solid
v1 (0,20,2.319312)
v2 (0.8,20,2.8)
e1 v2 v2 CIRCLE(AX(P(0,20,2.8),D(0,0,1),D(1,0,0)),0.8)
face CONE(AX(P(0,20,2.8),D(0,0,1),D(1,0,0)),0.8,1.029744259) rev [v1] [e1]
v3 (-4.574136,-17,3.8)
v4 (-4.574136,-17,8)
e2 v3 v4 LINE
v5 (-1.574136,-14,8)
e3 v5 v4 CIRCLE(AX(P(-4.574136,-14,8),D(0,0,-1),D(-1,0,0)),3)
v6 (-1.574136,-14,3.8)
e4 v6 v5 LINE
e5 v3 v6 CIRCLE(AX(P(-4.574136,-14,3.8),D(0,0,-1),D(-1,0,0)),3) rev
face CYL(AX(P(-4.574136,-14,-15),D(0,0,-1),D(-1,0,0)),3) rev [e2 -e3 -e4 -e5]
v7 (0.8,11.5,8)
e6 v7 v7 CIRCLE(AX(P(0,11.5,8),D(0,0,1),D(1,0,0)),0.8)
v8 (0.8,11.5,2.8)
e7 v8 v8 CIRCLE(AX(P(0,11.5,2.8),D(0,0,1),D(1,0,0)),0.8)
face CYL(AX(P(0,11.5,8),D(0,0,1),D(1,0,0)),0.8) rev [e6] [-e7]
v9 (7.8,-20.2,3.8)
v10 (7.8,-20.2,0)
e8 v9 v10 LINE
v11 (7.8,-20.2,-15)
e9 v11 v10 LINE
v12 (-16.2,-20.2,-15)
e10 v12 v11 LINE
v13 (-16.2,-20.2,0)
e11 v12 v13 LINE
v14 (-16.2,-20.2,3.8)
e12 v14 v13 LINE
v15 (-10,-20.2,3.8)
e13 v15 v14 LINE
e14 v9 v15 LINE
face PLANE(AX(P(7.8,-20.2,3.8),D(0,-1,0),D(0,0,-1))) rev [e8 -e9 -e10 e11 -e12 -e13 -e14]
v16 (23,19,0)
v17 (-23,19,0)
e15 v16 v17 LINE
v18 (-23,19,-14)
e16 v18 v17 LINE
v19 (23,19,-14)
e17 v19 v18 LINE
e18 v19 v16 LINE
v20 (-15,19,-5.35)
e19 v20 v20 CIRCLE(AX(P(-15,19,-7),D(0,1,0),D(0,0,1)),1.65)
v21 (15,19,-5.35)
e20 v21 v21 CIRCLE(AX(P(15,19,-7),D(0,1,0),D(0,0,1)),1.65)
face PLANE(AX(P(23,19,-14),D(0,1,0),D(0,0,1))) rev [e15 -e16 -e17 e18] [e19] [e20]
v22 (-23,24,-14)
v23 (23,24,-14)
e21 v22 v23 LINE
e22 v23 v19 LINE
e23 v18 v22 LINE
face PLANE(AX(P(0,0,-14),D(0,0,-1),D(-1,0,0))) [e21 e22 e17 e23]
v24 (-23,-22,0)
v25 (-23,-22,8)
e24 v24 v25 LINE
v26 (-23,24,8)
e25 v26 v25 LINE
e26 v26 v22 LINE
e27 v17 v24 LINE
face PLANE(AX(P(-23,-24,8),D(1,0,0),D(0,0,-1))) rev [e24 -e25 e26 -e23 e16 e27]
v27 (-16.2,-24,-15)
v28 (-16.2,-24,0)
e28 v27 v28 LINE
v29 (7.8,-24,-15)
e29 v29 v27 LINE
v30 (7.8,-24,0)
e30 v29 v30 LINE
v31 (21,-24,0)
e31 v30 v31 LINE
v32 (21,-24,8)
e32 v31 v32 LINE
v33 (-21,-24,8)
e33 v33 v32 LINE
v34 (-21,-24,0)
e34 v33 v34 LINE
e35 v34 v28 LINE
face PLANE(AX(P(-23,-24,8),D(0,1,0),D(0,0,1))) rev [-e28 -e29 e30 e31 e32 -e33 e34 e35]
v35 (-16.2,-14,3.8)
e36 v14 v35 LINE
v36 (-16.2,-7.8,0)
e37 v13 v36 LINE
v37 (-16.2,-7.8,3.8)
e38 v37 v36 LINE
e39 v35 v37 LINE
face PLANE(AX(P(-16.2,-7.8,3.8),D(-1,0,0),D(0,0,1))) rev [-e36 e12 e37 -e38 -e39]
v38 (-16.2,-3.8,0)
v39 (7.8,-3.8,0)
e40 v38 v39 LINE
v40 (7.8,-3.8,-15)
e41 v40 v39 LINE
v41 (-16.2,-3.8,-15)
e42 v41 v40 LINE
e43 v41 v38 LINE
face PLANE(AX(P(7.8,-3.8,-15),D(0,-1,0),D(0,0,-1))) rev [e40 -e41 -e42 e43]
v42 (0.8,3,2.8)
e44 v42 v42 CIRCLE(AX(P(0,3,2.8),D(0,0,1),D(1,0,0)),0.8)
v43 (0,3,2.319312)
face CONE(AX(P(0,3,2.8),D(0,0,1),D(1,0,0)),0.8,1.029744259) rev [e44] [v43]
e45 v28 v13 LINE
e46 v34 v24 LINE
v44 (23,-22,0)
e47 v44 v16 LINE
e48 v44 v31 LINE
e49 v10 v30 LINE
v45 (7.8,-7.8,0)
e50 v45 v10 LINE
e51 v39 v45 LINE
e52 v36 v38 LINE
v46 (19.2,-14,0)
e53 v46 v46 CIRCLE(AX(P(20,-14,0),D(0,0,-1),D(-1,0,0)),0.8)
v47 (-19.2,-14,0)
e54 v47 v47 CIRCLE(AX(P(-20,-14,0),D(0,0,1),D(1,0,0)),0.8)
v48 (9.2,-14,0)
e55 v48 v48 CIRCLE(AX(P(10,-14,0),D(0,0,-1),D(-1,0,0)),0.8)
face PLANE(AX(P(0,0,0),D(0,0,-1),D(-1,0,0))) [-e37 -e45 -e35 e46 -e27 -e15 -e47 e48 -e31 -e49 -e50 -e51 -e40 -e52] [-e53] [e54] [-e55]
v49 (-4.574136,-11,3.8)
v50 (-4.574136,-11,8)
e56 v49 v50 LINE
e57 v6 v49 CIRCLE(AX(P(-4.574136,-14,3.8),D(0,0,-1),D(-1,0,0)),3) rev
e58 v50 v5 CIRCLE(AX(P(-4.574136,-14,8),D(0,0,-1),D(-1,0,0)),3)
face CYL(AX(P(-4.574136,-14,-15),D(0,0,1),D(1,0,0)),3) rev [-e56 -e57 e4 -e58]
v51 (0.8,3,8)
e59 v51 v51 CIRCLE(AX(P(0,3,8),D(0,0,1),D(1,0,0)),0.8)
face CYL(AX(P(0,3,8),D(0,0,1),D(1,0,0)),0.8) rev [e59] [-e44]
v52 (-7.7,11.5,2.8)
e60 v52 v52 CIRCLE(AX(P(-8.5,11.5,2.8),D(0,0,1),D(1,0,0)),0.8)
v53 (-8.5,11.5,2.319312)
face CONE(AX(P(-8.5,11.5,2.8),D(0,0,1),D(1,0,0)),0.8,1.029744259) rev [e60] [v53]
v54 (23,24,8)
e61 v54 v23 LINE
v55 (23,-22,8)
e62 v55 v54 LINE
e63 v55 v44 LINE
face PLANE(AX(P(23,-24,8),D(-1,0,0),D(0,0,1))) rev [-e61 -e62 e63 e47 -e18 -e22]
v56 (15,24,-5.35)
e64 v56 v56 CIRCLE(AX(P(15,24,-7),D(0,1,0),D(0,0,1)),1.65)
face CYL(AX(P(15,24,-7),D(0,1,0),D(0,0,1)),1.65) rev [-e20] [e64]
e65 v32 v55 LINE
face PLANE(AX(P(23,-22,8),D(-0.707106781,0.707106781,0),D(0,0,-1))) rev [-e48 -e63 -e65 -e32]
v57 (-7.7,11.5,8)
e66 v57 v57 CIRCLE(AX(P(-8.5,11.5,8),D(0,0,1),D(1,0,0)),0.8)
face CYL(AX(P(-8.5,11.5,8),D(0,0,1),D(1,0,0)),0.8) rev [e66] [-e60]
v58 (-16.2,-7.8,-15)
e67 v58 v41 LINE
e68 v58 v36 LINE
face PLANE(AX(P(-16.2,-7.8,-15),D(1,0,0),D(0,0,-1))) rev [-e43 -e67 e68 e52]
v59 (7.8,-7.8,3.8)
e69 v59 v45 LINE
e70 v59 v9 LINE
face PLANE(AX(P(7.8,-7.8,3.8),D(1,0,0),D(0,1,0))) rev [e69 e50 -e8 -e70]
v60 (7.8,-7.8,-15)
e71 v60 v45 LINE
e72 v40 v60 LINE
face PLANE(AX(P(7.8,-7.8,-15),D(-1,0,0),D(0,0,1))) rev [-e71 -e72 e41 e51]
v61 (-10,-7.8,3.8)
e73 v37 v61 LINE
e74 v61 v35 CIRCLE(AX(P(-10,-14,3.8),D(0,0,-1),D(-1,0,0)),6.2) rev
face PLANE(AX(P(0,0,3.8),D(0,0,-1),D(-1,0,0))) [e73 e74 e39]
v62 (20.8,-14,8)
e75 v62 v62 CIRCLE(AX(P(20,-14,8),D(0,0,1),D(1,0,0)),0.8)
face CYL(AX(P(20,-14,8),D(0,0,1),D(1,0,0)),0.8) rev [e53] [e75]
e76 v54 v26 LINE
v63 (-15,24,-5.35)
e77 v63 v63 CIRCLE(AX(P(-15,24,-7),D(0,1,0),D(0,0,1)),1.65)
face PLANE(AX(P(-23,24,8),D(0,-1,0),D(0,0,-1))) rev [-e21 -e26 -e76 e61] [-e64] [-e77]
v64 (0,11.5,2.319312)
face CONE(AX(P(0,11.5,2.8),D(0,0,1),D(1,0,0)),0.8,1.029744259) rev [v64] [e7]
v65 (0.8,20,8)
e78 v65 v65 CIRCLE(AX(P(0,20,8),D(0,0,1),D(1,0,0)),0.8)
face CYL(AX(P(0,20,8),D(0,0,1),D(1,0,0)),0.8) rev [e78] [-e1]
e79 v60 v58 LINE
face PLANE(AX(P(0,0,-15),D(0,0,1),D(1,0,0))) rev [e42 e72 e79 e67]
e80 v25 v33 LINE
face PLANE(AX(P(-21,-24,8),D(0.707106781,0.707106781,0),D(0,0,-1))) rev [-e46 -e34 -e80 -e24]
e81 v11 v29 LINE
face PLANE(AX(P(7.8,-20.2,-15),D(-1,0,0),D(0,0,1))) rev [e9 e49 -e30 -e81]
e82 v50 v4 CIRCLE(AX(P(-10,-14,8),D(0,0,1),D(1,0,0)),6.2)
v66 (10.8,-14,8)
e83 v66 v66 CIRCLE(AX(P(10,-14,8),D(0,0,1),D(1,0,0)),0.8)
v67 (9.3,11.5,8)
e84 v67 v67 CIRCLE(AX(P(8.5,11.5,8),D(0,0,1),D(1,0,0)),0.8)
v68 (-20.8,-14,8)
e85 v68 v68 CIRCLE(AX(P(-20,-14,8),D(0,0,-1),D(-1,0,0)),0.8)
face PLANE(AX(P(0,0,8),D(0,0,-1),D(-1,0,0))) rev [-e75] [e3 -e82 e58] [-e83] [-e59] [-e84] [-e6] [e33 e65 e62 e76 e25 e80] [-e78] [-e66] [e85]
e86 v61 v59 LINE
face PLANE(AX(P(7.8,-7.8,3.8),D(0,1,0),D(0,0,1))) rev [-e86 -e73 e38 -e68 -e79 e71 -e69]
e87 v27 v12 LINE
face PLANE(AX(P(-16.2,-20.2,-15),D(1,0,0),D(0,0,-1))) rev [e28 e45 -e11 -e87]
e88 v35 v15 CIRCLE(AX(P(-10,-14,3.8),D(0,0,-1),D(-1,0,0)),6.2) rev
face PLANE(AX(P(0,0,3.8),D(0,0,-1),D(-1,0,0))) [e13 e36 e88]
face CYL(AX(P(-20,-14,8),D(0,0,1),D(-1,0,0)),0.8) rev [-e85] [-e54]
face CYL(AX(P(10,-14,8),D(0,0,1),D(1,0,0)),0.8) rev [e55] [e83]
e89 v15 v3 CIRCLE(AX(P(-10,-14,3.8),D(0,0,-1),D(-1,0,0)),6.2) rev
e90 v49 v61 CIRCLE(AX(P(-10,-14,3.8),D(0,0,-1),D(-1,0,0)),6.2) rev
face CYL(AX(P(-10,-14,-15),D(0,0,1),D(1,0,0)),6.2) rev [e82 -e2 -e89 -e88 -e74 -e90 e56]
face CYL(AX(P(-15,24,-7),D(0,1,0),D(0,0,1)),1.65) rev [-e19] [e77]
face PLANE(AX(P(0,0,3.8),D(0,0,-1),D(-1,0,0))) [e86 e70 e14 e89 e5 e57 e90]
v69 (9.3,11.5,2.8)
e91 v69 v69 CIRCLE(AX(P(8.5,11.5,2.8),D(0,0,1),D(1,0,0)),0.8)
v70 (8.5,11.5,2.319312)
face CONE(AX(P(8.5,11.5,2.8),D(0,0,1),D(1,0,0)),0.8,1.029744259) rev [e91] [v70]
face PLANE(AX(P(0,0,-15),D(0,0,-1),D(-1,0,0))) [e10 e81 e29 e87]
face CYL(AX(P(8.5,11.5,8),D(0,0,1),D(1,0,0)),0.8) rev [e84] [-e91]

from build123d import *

# Parameters (mm, degrees)
SKETCH_1_W                  = 46
SKETCH_1_H                  = 48
EXTRUDE_1_DEPTH             = 8
CHAMFER_1_SIZE              = 2
SKETCH_2_W                  = 46
SKETCH_2_H                  = 5
EXTRUDE_2_DEPTH             = 14
HOLE_WIZARD_M4_1_D          = 3.3
HOLE_WIZARD_M4_1_DEPTH      = 11.5
HOLE_WIZARD_M4_1_TIP        = 0.991420021
HOLE_WIZARD_M2_1_AT_2_COUNT = 2
HOLE_WIZARD_M2_1_AT_2_PITCH = 10
SKETCH_8_R                  = 0.8
CUT_EXTRUDE_1_DEPTH         = 23
SKETCH_9_W                  = 24
SKETCH_9_H                  = 12.4
CUT_EXTRUDE_2_DEPTH         = 3.8
SKETCH_11_W                 = 24
SKETCH_11_H                 = 3.8
SKETCH_11_H_2               = 4
EXTRUDE_3_DEPTH             = 15
FILLET_1_R                  = 3
HOLE_WIZARD_M2_2_D          = 1.6
HOLE_WIZARD_M2_2_DEPTH      = 5.2
HOLE_WIZARD_M2_2_TIP        = 0.480688495
HOLE_WIZARD_M2_3_D          = 1.6
HOLE_WIZARD_M2_3_DEPTH      = 5.2
HOLE_WIZARD_M2_3_TIP        = 0.480688495


with BuildPart() as part:
    # 草图1 → 凸台-拉伸1 (new body)
    with BuildSketch(Plane.XY):
        Rectangle(SKETCH_1_W, SKETCH_1_H)
    extrude(amount=EXTRUDE_1_DEPTH)

    # 倒角1
    chamfer_1_edges = [part.edges().sort_by_distance(p)[0] for p in [
        (23, -24, 4),
        (-23, -24, 4),
    ]]
    chamfer(chamfer_1_edges, length=CHAMFER_1_SIZE)

    # 草图2 → 凸台-拉伸2 (add)
    with BuildSketch(Plane(origin=(0, 0, 0), x_dir=(-1, 0, 0), z_dir=(0, 0, -1))):
        with Locations((0, 21.5)):
            Rectangle(SKETCH_2_W, SKETCH_2_H)
    extrude(amount=EXTRUDE_2_DEPTH)

    # M4 螺纹孔1
    with Locations(Plane(origin=(0, 24, 0), x_dir=(1, 0, 0), z_dir=(0, 1, 0))):
        with Locations((15, 7), (-15, 7)):
            Hole(HOLE_WIZARD_M4_1_D / 2, depth=HOLE_WIZARD_M4_1_DEPTH)
            with Locations((0, 0, -(HOLE_WIZARD_M4_1_DEPTH + HOLE_WIZARD_M4_1_TIP / 2))):  # 118° drill point
                Cone(0, HOLE_WIZARD_M4_1_D / 2, HOLE_WIZARD_M4_1_TIP, mode=Mode.SUBTRACT)

    # 草图6 → M2 螺纹孔1 (revolve, cut)
    with BuildSketch(Plane(origin=(10, -14, 8), x_dir=(0, -1, 0), z_dir=(1, 0, 0))):
        Polygon((0, 0), (0, 46.480688495), (0.8, 46), (0.8, 0), align=None)
    hole_wizard_m2_1 = revolve(axis=Axis((10, -14, 14.35), (0, 0, -1)), mode=Mode.SUBTRACT)

    # M2 螺纹孔1 at 2: M2 螺纹孔1 ×2
    with Locations(*[(i * HOLE_WIZARD_M2_1_AT_2_PITCH, 0, 0) for i in range(1, HOLE_WIZARD_M2_1_AT_2_COUNT)]):
        add(hole_wizard_m2_1, mode=Mode.SUBTRACT)

    # 镜向1: M2 螺纹孔1 across plane
    add(hole_wizard_m2_1.mirror(Plane(origin=(0, 0, 0), x_dir=(0, 0, 1), z_dir=(1, 0, 0))), mode=Mode.SUBTRACT)

    # 镜向1 copy 1 sketch → 镜向1 copy 1 (revolve, cut)
    with BuildSketch(Plane(origin=(-20, -14, 8), x_dir=(0, -1, 0), z_dir=(-1, 0, 0))):
        Polygon((0, 0), (0, -46.480688495), (0.8, -46), (0.8, 0), align=None)
    revolve(axis=Axis((-20, -14, 14.35), (0, 0, 1)), mode=Mode.SUBTRACT)

    # 草图8 → 切除-拉伸1 (cut)
    # profile 1 of 3: a face of its own
    with BuildSketch(Plane.XY.offset(8)):
        with BuildLine():
            ThreePointArc((-4.574136013, -11), (-16.2, -14), (-4.574136013, -17))
            Line((-4.574136013, -17), (-4.574136013, -11))
        make_face()
        with Locations((-10, -14)):
            Circle(SKETCH_8_R, mode=Mode.SUBTRACT)
    # profile 2 of 3: a face of its own
    with BuildSketch(Plane.XY.offset(8)):
        with BuildLine():
            Line((-4.574136013, -11), (-4.574136013, -17))
            ThreePointArc((-4.574136013, -17), (-3.996652737, -15.549135773), (-3.8, -14))
            ThreePointArc((-3.8, -14), (-3.996652737, -12.450864227), (-4.574136013, -11))
        make_face()
    # profile 3 of 3: a face of its own
    with BuildSketch(Plane.XY.offset(8)):
        with BuildLine():
            ThreePointArc((-3.8, -14), (-3.996652737, -15.549135773), (-4.574136013, -17))
            Line((-4.574136013, -17), (-1.574136013, -17))
            Line((-1.574136013, -17), (-1.574136013, -11))
            Line((-1.574136013, -11), (-4.574136013, -11))
            ThreePointArc((-4.574136013, -11), (-3.996652737, -12.450864227), (-3.8, -14))
        make_face()
    extrude(amount=-CUT_EXTRUDE_1_DEPTH, mode=Mode.SUBTRACT)

    # 草图9 → 切除-拉伸2 (cut)
    with BuildSketch(Plane(origin=(0, 0, 0), x_dir=(-1, 0, 0), z_dir=(0, 0, -1))):
        with Locations((4.2, -14)):
            Rectangle(SKETCH_9_W, SKETCH_9_H)
    extrude(amount=-CUT_EXTRUDE_2_DEPTH, mode=Mode.SUBTRACT)

    # 草图11 → 凸台-拉伸3 (add)
    with BuildSketch(Plane(origin=(0, 0, 0), x_dir=(-1, 0, 0), z_dir=(0, 0, -1))):
        with Locations((4.2, -22.1)):
            Rectangle(SKETCH_11_W, SKETCH_11_H)
        with Locations((4.2, -5.8)):
            Rectangle(SKETCH_11_W, SKETCH_11_H_2)
    extrude(amount=EXTRUDE_3_DEPTH)

    # 圆角1
    fillet_1_edges = [part.edges().sort_by_distance(p)[0] for p in [
        (-1.574136013, -11, 5.9),
        (-1.574136013, -17, 5.9),
    ]]
    fillet(fillet_1_edges, radius=FILLET_1_R - 0.0001)  # a hair under: the kernel refuses the full size

    # M2 螺纹孔2
    with Locations(Plane.XY.offset(8)):
        with Locations((0, 11.5)):
            Hole(HOLE_WIZARD_M2_2_D / 2, depth=HOLE_WIZARD_M2_2_DEPTH)
            with Locations((0, 0, -(HOLE_WIZARD_M2_2_DEPTH + HOLE_WIZARD_M2_2_TIP / 2))):  # 118° drill point
                Cone(0, HOLE_WIZARD_M2_2_D / 2, HOLE_WIZARD_M2_2_TIP, mode=Mode.SUBTRACT)

    # M2 螺纹孔3
    with Locations(Plane(origin=(0, 20, 8), x_dir=(1, 0, 0), z_dir=(0, 0, 1))):
        with Locations((0, 0), (8.5, -8.5), (0, -17), (-8.5, -8.5)):
            Hole(HOLE_WIZARD_M2_3_D / 2, depth=HOLE_WIZARD_M2_3_DEPTH)
            with Locations((0, 0, -(HOLE_WIZARD_M2_3_DEPTH + HOLE_WIZARD_M2_3_TIP / 2))):  # 118° drill point
                Cone(0, HOLE_WIZARD_M2_3_D / 2, HOLE_WIZARD_M2_3_TIP, mode=Mode.SUBTRACT)


solid = part.part
